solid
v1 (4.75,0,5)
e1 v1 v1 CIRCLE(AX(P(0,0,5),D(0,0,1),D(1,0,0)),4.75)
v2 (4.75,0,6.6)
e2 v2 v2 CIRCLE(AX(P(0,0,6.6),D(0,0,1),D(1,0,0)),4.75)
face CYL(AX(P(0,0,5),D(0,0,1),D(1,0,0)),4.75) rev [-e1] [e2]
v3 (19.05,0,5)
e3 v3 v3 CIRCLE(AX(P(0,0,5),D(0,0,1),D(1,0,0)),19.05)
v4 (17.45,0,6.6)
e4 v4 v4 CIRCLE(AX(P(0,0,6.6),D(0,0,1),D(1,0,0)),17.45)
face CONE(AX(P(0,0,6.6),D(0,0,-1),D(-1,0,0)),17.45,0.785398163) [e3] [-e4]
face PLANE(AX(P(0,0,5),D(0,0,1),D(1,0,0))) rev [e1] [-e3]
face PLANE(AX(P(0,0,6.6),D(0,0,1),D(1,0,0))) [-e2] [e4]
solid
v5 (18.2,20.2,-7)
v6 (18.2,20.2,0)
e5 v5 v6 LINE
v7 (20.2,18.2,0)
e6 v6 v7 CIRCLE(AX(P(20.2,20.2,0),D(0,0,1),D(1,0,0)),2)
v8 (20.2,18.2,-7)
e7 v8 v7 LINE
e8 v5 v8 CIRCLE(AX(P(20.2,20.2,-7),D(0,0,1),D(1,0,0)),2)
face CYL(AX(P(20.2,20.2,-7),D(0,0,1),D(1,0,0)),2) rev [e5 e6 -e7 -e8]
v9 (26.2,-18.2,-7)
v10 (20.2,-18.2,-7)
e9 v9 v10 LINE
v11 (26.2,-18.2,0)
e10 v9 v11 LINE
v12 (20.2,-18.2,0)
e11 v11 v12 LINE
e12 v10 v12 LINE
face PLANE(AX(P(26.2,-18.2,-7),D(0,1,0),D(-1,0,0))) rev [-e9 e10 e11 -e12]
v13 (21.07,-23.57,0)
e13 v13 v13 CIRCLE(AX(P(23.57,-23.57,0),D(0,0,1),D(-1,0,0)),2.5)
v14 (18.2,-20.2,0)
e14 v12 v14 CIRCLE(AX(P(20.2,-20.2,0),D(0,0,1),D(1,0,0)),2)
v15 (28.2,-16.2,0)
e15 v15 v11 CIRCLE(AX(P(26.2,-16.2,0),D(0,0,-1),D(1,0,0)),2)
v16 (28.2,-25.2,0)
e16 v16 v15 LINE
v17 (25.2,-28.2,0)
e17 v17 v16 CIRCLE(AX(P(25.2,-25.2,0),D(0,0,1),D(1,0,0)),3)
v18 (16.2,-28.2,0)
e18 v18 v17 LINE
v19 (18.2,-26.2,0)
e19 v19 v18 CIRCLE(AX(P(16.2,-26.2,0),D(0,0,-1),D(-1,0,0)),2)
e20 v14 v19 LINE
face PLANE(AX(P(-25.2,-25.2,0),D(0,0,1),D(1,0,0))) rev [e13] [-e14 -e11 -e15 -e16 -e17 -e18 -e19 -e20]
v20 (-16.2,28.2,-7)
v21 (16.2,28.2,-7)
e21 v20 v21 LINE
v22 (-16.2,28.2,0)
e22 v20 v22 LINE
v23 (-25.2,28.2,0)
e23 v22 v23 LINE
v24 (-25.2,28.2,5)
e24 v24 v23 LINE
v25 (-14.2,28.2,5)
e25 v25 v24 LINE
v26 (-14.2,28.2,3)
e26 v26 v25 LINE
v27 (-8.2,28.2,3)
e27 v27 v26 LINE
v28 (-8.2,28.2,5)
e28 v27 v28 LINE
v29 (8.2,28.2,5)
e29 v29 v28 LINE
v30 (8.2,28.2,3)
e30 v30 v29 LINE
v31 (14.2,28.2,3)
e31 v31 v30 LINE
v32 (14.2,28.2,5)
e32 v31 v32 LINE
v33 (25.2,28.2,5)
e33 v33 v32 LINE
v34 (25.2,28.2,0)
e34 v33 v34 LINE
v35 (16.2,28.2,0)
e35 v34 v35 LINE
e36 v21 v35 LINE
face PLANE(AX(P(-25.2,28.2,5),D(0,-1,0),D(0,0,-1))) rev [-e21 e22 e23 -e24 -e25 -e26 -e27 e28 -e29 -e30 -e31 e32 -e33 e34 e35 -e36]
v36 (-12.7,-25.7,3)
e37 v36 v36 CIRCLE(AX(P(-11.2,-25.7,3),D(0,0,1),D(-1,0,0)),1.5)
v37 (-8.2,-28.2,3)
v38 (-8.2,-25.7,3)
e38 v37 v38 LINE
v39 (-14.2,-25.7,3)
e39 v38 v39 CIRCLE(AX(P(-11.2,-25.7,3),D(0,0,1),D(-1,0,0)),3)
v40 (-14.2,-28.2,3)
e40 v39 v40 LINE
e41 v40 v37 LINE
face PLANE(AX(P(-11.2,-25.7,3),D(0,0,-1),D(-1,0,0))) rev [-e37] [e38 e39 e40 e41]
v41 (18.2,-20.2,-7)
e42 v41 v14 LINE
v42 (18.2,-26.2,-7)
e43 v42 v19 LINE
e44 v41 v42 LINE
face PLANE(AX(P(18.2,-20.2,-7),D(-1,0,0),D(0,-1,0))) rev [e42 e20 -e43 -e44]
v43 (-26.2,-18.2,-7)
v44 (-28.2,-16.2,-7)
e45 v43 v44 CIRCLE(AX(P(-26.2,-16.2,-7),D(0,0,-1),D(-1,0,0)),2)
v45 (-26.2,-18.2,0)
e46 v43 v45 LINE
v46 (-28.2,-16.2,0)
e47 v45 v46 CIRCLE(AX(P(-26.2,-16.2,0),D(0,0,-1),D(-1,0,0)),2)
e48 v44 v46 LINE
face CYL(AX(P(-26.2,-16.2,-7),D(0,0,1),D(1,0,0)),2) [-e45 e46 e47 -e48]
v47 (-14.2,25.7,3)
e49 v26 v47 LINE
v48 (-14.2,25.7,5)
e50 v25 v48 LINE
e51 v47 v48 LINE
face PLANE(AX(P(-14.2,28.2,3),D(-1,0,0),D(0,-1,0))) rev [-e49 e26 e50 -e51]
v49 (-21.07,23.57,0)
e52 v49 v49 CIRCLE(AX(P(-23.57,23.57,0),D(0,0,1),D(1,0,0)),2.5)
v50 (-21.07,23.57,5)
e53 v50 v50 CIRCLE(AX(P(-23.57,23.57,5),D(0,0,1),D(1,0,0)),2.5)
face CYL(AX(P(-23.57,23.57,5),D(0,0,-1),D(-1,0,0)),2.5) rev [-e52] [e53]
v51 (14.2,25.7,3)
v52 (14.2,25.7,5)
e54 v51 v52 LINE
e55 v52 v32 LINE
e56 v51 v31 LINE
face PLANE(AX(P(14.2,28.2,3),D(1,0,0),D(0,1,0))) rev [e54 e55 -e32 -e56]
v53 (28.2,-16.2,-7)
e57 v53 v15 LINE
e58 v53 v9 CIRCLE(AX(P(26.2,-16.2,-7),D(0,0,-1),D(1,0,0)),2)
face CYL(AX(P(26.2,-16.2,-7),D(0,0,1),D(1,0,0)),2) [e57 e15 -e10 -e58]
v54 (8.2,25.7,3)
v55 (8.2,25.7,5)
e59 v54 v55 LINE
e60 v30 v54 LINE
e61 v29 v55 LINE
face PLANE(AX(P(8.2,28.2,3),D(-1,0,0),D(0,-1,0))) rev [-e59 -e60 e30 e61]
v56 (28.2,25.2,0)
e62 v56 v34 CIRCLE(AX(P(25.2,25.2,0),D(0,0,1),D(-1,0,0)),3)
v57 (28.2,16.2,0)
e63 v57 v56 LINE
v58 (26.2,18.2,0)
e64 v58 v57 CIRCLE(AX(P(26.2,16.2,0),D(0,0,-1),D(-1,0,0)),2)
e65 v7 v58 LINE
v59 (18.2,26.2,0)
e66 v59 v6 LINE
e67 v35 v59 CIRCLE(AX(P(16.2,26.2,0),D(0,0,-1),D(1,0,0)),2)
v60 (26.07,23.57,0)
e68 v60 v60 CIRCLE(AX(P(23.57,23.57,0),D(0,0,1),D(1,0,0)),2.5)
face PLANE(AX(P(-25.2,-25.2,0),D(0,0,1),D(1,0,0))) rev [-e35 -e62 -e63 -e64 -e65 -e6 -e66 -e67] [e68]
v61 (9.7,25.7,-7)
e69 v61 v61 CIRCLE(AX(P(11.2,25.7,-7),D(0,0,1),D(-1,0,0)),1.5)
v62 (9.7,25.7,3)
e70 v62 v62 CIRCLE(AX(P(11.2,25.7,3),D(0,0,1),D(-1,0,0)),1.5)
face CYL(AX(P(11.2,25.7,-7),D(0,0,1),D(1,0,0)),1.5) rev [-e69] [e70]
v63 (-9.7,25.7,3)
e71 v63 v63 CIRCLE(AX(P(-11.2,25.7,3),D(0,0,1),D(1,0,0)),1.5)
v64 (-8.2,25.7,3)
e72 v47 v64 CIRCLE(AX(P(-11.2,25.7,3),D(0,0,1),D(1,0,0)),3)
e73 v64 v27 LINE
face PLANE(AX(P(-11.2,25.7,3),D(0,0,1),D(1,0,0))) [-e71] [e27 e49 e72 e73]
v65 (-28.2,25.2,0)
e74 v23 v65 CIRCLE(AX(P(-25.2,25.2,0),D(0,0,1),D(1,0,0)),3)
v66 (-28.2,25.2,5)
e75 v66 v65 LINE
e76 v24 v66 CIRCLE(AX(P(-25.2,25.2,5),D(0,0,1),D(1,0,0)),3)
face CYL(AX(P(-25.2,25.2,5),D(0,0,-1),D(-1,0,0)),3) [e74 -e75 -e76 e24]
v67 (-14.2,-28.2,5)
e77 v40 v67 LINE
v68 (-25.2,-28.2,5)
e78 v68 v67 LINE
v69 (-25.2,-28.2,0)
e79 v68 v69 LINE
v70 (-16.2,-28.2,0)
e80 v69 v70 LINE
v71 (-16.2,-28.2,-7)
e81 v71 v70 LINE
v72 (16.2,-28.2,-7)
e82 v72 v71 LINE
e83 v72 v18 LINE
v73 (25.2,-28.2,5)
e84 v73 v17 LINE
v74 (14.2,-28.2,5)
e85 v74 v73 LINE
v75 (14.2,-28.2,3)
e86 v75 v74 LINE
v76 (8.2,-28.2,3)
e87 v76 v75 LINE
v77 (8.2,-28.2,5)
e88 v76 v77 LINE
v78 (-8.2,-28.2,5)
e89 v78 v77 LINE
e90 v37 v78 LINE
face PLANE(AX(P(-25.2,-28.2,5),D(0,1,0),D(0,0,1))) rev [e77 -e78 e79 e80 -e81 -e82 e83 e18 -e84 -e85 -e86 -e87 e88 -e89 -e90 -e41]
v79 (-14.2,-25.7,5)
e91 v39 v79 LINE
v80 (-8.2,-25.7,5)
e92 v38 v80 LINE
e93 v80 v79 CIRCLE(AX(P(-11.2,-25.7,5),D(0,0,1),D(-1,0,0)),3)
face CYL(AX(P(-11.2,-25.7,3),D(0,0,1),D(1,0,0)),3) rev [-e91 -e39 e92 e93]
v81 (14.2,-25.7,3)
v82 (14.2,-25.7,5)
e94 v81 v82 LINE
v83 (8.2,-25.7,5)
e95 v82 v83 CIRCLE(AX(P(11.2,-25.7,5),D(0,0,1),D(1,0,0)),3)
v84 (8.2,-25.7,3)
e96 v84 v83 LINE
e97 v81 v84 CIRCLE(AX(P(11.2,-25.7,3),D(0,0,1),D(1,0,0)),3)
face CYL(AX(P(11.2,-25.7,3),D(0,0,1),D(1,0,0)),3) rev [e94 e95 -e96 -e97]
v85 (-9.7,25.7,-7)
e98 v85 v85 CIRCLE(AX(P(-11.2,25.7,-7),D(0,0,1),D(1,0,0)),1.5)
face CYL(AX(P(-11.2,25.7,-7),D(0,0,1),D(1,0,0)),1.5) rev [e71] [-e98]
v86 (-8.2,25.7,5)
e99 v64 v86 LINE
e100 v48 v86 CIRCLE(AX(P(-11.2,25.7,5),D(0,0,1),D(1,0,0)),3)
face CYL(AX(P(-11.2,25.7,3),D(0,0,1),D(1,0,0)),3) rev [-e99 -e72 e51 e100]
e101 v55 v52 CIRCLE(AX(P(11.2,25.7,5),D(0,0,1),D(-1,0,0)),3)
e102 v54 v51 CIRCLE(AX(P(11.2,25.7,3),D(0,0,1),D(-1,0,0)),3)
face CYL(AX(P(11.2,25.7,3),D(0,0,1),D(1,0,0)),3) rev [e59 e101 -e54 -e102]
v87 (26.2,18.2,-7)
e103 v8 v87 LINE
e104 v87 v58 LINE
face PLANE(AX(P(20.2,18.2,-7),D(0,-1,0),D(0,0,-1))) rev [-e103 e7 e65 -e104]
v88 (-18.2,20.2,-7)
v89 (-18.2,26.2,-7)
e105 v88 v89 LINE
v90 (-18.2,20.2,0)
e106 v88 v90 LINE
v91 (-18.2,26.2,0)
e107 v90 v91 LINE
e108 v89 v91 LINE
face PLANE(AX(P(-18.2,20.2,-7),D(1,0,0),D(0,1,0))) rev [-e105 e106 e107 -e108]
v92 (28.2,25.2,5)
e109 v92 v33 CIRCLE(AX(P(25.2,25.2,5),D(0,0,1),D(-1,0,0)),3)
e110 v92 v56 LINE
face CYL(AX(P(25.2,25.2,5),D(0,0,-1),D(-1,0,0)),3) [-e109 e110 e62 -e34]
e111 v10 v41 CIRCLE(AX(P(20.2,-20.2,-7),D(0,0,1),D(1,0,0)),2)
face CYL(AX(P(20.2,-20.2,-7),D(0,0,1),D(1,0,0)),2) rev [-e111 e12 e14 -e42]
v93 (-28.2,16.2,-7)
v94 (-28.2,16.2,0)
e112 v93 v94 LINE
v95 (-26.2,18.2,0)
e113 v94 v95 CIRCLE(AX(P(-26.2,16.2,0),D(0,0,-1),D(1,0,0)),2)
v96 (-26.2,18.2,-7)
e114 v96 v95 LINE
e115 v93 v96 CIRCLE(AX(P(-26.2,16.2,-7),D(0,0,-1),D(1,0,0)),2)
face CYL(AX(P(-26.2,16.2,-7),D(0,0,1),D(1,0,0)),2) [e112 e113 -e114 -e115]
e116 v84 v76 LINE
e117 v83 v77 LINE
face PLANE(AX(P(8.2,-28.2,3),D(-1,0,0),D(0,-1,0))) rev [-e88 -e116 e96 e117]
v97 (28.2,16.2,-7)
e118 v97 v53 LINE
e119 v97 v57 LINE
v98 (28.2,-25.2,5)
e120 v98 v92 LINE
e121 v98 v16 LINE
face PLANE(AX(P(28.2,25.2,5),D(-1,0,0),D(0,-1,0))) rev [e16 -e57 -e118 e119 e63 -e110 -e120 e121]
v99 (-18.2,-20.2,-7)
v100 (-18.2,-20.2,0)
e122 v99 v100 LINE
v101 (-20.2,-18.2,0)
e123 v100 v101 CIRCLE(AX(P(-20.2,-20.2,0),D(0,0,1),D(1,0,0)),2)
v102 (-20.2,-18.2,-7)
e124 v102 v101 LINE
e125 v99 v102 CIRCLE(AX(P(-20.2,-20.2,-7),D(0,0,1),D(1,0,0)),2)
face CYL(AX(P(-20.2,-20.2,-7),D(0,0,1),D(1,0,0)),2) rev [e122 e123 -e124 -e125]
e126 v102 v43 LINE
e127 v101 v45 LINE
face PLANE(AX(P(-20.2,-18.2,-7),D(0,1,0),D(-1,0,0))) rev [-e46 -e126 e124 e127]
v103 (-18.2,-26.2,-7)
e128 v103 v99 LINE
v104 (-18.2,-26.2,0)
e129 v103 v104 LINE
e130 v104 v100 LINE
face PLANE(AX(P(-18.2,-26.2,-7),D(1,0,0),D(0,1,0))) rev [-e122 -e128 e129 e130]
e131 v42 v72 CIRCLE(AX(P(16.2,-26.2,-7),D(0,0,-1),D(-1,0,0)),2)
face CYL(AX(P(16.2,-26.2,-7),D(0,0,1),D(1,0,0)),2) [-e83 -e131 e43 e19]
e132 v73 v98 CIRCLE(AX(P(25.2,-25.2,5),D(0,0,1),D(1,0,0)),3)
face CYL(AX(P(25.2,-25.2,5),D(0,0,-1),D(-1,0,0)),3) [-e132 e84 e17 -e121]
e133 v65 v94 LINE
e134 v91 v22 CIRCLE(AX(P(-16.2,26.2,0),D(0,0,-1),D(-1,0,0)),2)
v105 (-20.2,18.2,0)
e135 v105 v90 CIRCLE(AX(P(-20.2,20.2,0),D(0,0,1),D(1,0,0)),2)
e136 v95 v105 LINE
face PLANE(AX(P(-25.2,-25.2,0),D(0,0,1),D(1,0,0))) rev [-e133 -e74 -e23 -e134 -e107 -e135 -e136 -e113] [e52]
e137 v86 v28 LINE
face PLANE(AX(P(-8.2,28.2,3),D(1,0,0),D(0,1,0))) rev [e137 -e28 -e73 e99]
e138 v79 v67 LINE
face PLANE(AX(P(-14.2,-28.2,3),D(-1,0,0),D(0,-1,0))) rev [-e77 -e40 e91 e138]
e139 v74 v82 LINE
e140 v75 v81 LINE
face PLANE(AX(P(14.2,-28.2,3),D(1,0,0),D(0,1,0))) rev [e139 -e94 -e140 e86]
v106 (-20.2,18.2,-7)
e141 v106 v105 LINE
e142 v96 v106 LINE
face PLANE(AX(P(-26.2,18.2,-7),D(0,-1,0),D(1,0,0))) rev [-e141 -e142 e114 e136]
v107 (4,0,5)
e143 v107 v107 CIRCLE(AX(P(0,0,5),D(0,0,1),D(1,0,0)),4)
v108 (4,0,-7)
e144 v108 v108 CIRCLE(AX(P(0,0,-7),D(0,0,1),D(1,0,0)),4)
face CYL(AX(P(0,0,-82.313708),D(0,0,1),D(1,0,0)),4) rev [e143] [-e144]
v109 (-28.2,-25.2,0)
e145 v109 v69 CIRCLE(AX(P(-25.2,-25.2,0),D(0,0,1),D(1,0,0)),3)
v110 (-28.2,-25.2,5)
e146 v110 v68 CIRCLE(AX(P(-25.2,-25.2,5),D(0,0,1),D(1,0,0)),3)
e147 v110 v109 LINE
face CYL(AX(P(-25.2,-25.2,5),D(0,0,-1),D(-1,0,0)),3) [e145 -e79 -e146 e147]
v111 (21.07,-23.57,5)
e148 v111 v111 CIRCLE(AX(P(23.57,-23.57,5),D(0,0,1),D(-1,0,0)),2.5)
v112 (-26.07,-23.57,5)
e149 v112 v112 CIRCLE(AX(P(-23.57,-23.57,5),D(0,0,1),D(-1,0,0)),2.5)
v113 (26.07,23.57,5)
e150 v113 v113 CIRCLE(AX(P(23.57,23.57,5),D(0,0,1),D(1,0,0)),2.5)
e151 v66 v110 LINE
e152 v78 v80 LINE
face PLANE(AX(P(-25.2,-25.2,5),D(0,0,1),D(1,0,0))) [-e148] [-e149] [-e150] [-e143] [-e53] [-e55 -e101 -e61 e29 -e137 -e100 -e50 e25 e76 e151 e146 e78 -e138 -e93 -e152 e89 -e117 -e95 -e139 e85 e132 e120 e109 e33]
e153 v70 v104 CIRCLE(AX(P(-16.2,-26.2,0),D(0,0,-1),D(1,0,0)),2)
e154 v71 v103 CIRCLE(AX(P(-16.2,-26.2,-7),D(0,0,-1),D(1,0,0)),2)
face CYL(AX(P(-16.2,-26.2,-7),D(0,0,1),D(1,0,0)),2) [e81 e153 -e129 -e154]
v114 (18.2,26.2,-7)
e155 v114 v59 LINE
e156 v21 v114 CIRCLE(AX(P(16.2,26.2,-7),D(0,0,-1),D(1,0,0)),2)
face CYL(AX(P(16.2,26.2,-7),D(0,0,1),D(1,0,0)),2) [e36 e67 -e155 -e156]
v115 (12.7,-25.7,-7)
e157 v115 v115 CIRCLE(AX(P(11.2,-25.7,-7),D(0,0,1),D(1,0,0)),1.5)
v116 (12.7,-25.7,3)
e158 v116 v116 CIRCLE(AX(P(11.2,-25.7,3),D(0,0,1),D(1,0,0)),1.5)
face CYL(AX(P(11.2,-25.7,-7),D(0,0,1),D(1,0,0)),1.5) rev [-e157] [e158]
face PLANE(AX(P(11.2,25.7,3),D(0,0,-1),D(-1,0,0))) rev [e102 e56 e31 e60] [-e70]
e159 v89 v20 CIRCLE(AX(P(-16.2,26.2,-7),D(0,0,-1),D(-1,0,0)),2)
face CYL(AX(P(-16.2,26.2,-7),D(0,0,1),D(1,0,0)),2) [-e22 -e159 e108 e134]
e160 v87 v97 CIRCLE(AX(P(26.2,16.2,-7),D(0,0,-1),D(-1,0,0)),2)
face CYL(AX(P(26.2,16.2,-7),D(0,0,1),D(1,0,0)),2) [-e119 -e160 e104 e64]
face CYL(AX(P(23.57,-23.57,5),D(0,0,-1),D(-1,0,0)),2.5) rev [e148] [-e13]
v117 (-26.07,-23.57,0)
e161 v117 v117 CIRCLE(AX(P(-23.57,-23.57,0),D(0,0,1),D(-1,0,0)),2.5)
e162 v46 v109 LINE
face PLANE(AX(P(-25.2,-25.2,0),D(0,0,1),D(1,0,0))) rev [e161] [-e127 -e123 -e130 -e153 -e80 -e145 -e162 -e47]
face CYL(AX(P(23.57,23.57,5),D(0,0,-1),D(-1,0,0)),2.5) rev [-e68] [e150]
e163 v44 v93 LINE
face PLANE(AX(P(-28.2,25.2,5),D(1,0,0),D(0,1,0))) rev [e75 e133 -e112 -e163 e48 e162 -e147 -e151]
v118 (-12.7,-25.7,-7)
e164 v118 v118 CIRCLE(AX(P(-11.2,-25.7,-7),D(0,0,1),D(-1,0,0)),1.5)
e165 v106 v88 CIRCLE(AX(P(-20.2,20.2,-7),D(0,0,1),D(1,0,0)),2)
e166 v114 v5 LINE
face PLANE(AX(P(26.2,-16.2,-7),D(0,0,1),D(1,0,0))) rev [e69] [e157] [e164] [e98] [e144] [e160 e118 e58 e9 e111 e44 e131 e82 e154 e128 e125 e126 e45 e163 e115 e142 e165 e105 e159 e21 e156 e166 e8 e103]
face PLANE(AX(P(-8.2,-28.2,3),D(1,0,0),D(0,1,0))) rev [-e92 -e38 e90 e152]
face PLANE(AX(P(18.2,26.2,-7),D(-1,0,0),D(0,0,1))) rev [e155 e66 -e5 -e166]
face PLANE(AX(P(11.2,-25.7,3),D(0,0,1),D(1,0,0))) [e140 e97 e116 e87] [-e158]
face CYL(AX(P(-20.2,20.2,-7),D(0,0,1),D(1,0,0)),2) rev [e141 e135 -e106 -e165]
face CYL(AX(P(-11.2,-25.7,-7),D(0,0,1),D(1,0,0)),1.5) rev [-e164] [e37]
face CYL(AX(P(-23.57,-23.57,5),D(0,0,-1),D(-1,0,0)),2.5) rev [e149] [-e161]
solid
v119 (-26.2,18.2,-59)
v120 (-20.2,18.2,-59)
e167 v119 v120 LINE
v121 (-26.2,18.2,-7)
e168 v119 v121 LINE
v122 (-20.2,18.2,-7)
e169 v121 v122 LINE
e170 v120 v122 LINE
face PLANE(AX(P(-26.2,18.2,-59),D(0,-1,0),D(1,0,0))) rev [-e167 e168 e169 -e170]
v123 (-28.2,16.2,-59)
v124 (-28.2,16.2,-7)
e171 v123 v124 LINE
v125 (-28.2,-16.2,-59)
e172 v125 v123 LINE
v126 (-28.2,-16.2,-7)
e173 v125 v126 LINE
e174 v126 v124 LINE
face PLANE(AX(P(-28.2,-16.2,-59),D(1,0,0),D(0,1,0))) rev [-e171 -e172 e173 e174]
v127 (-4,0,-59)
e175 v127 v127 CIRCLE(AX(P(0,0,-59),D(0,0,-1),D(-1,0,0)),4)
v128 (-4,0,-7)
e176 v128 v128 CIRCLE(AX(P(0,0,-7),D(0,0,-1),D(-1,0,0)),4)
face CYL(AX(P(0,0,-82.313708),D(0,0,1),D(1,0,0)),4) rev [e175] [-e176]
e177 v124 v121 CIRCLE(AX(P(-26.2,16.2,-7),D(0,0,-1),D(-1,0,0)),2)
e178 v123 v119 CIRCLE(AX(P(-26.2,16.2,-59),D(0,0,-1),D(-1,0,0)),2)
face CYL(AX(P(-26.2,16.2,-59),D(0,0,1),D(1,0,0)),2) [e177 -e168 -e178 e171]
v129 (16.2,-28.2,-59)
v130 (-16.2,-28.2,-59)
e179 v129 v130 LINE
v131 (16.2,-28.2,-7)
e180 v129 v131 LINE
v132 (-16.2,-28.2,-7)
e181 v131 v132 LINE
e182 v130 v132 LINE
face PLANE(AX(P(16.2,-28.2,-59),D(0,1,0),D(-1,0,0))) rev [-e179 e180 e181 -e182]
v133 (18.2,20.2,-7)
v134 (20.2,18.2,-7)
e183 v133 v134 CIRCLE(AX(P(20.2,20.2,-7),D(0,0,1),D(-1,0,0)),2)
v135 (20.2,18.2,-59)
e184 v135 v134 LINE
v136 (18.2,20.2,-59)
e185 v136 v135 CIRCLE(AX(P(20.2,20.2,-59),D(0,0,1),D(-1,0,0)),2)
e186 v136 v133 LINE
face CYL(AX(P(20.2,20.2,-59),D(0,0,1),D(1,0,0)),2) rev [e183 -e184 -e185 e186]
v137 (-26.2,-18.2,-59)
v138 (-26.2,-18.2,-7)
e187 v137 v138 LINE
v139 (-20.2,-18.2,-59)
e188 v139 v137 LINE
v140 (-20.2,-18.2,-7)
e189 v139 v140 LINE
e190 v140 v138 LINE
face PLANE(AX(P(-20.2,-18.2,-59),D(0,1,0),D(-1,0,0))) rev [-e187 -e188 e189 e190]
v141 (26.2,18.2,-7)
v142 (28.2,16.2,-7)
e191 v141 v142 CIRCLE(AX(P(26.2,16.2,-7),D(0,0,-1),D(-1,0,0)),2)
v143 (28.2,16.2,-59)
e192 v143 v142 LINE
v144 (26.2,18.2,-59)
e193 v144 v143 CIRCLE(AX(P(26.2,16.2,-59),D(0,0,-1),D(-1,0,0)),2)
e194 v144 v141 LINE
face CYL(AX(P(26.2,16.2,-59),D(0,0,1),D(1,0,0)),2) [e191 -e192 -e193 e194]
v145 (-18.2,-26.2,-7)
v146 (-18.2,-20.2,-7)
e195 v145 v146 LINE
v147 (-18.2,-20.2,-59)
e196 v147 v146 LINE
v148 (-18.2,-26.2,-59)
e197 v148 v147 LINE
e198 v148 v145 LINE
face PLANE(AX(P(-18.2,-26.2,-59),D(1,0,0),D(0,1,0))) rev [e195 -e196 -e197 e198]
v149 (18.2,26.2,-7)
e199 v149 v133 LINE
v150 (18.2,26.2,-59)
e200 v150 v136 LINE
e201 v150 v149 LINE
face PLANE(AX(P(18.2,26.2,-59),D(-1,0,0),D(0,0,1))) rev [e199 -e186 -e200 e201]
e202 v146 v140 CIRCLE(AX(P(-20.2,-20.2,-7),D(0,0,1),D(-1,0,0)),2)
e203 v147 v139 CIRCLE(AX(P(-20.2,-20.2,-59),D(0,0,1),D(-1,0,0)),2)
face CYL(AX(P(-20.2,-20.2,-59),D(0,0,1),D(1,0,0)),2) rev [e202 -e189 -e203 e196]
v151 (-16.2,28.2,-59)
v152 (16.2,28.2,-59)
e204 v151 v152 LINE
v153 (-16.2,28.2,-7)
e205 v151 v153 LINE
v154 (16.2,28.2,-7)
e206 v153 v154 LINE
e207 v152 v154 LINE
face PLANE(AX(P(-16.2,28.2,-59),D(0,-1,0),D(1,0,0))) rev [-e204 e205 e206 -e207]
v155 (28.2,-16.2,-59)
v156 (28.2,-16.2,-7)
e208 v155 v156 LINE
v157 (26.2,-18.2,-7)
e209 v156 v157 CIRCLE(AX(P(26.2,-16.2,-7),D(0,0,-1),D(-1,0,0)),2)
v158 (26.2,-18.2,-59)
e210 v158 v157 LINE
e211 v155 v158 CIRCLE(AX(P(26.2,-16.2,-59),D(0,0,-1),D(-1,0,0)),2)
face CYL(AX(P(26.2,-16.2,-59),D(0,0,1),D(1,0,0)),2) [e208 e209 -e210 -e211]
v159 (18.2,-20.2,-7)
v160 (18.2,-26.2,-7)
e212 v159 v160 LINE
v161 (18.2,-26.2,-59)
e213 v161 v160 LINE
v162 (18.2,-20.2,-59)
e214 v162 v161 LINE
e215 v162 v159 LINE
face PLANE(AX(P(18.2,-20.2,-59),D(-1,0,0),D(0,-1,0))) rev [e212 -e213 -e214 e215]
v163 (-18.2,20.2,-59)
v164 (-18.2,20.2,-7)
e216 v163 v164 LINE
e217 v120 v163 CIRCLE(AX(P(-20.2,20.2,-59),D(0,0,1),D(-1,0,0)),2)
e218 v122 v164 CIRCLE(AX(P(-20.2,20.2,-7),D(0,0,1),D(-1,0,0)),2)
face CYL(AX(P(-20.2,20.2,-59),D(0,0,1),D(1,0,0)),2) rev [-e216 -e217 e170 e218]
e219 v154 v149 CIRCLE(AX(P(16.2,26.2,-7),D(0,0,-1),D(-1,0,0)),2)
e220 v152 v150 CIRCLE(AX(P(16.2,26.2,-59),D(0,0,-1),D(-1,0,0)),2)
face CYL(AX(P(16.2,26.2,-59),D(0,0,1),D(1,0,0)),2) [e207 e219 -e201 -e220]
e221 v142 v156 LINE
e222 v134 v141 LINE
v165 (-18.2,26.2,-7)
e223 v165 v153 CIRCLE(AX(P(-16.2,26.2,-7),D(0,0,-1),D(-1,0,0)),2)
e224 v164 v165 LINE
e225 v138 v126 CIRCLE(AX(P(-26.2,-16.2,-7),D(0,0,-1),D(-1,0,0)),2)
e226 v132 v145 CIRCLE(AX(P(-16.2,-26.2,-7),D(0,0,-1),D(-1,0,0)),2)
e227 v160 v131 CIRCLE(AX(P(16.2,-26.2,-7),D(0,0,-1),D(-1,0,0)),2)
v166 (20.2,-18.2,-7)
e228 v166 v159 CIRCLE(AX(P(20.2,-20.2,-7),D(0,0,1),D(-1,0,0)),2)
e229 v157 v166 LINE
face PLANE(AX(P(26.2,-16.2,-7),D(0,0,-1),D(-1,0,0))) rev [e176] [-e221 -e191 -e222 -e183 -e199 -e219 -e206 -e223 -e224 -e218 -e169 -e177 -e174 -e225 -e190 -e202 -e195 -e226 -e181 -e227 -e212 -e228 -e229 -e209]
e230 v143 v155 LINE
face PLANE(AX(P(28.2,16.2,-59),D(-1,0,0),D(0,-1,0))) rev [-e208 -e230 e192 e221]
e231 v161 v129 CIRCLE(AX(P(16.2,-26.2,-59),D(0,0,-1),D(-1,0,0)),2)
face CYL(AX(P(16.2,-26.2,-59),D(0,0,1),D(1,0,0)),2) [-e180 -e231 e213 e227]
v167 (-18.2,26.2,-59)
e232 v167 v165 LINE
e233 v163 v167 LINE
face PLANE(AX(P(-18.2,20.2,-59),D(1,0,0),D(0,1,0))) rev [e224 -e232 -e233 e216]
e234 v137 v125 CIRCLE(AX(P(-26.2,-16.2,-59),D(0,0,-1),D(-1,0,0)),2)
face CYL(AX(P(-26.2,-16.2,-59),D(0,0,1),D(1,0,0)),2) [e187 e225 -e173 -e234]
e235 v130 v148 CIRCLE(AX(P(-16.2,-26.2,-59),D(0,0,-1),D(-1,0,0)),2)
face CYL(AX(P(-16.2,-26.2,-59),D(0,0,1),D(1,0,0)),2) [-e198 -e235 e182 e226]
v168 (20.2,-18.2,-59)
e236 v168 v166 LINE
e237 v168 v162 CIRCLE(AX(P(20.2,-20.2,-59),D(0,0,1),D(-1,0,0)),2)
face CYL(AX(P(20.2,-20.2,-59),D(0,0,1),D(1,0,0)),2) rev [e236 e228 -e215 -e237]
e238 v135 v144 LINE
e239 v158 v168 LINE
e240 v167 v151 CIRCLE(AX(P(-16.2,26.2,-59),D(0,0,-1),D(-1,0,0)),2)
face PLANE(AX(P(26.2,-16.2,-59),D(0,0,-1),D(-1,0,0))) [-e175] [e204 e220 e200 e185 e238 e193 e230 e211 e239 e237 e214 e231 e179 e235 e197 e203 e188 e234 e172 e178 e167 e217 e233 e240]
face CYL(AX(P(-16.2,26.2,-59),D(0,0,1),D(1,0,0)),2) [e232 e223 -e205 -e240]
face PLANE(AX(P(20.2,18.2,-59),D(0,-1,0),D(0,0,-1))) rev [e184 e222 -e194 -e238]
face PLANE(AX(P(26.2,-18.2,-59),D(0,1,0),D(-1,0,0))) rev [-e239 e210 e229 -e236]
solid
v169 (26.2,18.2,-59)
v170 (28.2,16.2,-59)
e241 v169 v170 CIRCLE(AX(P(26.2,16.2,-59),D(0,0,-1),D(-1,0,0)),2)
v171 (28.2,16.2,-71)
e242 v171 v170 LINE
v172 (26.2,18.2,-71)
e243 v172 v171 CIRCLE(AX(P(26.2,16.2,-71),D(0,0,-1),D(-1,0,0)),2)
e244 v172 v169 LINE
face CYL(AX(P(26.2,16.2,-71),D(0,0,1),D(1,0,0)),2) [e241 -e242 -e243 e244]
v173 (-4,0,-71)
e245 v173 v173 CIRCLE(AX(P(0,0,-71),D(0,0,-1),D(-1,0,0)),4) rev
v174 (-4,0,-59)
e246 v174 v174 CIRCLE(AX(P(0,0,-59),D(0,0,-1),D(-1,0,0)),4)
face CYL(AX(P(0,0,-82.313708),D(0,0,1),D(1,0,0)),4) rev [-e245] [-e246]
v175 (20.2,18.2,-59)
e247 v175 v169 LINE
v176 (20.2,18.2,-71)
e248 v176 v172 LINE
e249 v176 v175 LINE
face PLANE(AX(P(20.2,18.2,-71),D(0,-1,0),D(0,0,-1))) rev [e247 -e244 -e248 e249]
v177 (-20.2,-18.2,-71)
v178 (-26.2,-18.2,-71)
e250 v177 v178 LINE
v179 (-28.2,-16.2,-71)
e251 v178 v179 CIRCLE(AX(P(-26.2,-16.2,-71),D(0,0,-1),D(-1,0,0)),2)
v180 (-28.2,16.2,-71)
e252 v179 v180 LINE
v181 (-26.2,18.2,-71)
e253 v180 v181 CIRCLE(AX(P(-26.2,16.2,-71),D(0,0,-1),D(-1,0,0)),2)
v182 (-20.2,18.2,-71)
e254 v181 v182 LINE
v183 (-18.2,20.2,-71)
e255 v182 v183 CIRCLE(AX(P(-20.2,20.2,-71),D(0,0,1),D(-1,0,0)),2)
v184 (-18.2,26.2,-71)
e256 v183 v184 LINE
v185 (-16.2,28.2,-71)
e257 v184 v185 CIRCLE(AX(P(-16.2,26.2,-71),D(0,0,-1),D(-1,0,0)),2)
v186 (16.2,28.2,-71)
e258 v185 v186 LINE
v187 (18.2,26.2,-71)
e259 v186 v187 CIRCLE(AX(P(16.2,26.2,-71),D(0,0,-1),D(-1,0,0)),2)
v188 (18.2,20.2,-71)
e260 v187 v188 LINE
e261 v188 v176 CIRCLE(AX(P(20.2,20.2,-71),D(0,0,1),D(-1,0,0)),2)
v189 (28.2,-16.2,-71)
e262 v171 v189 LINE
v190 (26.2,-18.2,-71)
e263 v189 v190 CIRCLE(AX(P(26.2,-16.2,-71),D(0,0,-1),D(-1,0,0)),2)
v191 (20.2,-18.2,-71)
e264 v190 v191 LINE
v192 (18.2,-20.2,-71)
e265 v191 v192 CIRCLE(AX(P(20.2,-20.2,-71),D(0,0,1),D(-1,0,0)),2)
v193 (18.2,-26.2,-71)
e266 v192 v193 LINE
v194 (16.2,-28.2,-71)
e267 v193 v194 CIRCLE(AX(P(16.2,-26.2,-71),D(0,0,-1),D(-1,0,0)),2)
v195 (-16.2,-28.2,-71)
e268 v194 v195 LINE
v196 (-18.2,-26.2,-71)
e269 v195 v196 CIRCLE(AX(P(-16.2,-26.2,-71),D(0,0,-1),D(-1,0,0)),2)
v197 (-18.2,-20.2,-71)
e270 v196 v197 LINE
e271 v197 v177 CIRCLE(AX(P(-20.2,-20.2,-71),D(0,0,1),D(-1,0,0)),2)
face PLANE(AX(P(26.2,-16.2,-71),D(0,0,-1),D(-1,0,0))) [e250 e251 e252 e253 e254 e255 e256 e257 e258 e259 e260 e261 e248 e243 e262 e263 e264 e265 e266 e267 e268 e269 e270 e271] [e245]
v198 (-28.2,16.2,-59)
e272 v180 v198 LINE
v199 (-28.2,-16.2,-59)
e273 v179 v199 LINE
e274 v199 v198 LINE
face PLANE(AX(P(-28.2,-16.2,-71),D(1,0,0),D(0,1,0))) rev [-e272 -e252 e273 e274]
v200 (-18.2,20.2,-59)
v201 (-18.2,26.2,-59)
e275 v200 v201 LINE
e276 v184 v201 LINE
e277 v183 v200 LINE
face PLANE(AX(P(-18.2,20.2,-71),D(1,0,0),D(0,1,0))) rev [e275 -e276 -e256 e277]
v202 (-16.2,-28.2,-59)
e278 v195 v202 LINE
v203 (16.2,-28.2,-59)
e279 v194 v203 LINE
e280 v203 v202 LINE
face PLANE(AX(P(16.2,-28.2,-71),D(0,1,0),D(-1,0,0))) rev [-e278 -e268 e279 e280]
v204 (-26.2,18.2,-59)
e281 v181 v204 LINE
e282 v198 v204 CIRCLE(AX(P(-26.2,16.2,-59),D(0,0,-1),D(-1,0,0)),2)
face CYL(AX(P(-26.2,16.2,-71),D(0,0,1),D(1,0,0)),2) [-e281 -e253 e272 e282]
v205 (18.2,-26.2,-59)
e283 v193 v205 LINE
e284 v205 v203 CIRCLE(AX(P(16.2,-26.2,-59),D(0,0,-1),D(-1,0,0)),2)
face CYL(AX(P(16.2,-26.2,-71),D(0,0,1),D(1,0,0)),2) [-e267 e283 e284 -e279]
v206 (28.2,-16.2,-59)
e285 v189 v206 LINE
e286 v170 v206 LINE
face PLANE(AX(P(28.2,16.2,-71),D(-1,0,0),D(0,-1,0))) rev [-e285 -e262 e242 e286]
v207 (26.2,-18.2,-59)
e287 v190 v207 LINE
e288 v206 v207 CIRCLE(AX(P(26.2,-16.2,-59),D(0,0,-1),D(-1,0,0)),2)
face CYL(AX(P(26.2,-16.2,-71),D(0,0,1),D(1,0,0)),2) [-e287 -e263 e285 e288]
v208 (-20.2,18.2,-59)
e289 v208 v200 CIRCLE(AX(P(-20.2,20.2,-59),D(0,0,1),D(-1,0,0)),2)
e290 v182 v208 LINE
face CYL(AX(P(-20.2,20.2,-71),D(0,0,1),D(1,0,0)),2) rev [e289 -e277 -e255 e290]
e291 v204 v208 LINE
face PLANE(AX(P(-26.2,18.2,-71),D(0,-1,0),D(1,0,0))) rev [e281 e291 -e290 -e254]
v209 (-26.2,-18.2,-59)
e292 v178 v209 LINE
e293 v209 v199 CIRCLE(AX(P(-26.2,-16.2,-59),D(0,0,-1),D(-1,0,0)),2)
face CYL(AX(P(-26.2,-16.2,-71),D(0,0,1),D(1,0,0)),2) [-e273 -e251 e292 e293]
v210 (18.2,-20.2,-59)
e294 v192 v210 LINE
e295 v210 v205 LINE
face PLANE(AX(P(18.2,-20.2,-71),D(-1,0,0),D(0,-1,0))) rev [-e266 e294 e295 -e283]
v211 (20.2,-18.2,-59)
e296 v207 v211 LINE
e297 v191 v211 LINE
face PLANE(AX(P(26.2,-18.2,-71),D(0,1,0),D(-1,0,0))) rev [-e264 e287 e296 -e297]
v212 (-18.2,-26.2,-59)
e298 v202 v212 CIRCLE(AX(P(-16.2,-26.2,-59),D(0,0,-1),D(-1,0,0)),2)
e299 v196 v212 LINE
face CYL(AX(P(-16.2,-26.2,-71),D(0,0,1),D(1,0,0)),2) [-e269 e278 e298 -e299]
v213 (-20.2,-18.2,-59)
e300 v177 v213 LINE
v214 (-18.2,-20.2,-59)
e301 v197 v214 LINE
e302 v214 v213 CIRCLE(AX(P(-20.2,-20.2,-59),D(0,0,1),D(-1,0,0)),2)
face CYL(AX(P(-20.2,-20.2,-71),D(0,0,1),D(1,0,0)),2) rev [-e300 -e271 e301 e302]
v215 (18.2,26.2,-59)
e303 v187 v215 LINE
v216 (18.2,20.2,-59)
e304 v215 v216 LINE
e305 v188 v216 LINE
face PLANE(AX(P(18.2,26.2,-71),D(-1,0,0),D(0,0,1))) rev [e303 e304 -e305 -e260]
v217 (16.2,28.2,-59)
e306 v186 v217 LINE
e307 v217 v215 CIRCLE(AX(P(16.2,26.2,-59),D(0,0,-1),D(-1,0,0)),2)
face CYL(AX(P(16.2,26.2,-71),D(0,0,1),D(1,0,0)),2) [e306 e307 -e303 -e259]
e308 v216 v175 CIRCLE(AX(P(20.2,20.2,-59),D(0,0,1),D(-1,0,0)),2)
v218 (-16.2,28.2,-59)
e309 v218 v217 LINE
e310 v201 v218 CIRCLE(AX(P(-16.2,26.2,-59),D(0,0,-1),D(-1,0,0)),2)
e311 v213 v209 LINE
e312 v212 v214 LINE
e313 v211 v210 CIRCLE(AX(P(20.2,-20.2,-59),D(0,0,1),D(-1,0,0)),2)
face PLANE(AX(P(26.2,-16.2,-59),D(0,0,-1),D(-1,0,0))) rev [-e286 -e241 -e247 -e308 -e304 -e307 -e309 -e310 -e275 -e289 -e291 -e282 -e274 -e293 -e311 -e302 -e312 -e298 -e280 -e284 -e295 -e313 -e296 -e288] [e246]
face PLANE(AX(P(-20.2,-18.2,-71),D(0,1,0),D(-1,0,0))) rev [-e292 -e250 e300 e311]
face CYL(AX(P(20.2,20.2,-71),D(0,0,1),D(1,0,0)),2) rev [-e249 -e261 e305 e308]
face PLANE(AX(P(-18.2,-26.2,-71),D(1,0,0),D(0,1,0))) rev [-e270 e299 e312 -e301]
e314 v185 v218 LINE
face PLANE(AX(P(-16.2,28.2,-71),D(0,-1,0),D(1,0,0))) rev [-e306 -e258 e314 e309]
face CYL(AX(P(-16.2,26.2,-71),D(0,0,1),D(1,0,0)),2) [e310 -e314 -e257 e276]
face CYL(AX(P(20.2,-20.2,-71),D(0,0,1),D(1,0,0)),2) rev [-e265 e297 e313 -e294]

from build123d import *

# Parameters (mm, degrees)
IZIM2_R                     = 2.5
Y_KSEKLIK_EKSTR_ZYON1_DEPTH = 5
Y_KSEKLIK_EKSTR_ZYON2_DEPTH = 7
KES_EKSTR_ZYON1_DEPTH       = 2
IZIM6_R                     = 19.05
Y_KSEKLIK_EKSTR_ZYON3_DEPTH = 1.6
PAH1_SIZE                   = 1.6
Y_KSEKLIK_EKSTR_ZYON5_DEPTH = 52
Y_KSEKLIK_EKSTR_ZYON6_DEPTH = 12
IZIM10_R                    = 1.5
KES_EKSTR_ZYON3_DEPTH       = 10
KES_EKSTR_ZYON4_START       = -77.6
IZIM7_R                     = 4
KES_EKSTR_ZYON4_DEPTH       = 77.6
IZIM11_R                    = 4.75
KES_EKSTR_ZYON5_DEPTH       = 1.6


with BuildPart() as part:
    # Çizim2 → Yükseklik-Ekstrüzyon1 (new body)
    with BuildSketch(Plane.XY):
        with BuildLine():
            Line((-25.2, 28.2), (25.2, 28.2))
            ThreePointArc((25.2, 28.2), (27.321320344, 27.321320344), (28.2, 25.2))
            Line((28.2, 25.2), (28.2, -25.2))
            ThreePointArc((28.2, -25.2), (27.321320344, -27.321320344), (25.2, -28.2))
            Line((25.2, -28.2), (-25.2, -28.2))
            ThreePointArc((-25.2, -28.2), (-27.321320344, -27.321320344), (-28.2, -25.2))
            Line((-28.2, -25.2), (-28.2, 25.2))
            ThreePointArc((-28.2, 25.2), (-27.321320344, 27.321320344), (-25.2, 28.2))
        make_face()
        with Locations((-23.57, 23.57)):
            Circle(IZIM2_R, mode=Mode.SUBTRACT)
        with Locations((23.57, 23.57)):
            Circle(IZIM2_R, mode=Mode.SUBTRACT)
        with Locations(Location((23.57, -23.57, 0), (0, 0, 180))):
            Circle(IZIM2_R, mode=Mode.SUBTRACT)
        with Locations(Location((-23.57, -23.57, 0), (0, 0, 180))):
            Circle(IZIM2_R, mode=Mode.SUBTRACT)
    extrude(amount=Y_KSEKLIK_EKSTR_ZYON1_DEPTH)

    # Çizim4 → Yükseklik-Ekstrüzyon2 (add)
    with BuildSketch(Plane(origin=(0, 0, 0), x_dir=(-1, 0, 0), z_dir=(0, 0, -1))):
        with BuildLine():
            Line((-18.2, 26.2), (-18.2, 20.2))
            ThreePointArc((-18.2, 20.2), (-18.785786438, 18.785786438), (-20.2, 18.2))
            Line((-20.2, 18.2), (-26.2, 18.2))
            ThreePointArc((-26.2, 18.2), (-27.614213562, 17.614213562), (-28.2, 16.2))
            Line((-28.2, 16.2), (-28.2, -16.2))
            ThreePointArc((-28.2, -16.2), (-27.614213562, -17.614213562), (-26.2, -18.2))
            Line((-26.2, -18.2), (-20.2, -18.2))
            ThreePointArc((-20.2, -18.2), (-18.785786438, -18.785786438), (-18.2, -20.2))
            Line((-18.2, -20.2), (-18.2, -26.2))
            ThreePointArc((-18.2, -26.2), (-17.614213562, -27.614213562), (-16.2, -28.2))
            Line((-16.2, -28.2), (16.2, -28.2))
            ThreePointArc((16.2, -28.2), (17.614213562, -27.614213562), (18.2, -26.2))
            Line((18.2, -26.2), (18.2, -20.2))
            ThreePointArc((18.2, -20.2), (18.785786438, -18.785786438), (20.2, -18.2))
            Line((20.2, -18.2), (26.2, -18.2))
            ThreePointArc((26.2, -18.2), (27.614213562, -17.614213562), (28.2, -16.2))
            Line((28.2, -16.2), (28.2, 16.2))
            ThreePointArc((28.2, 16.2), (27.614213562, 17.614213562), (26.2, 18.2))
            Line((26.2, 18.2), (20.2, 18.2))
            ThreePointArc((20.2, 18.2), (18.785786438, 18.785786438), (18.2, 20.2))
            Line((18.2, 20.2), (18.2, 26.2))
            ThreePointArc((18.2, 26.2), (17.614213562, 27.614213562), (16.2, 28.2))
            Line((16.2, 28.2), (-16.2, 28.2))
            ThreePointArc((-16.2, 28.2), (-17.614213562, 27.614213562), (-18.2, 26.2))
        make_face()
    extrude(amount=Y_KSEKLIK_EKSTR_ZYON2_DEPTH)

    # Çizim5 → Kes-Ekstrüzyon1 (cut)
    with BuildSketch(Plane.XY.offset(5)):
        with BuildLine():
            Line((-14.2, 28.2), (-14.2, 25.7))
            ThreePointArc((-14.2, 25.7), (-11.2, 22.7), (-8.2, 25.7))
            Line((-8.2, 25.7), (-8.2, 28.2))
            Line((-8.2, 28.2), (-14.2, 28.2))
        make_face()
        with BuildLine():
            Line((-14.2, -28.2), (-8.2, -28.2))
            Line((-8.2, -28.2), (-8.2, -25.7))
            ThreePointArc((-8.2, -25.7), (-11.2, -22.7), (-14.2, -25.7))
            Line((-14.2, -25.7), (-14.2, -28.2))
        make_face()
        with BuildLine():
            Line((14.2, -28.2), (14.2, -25.7))
            ThreePointArc((14.2, -25.7), (11.2, -22.7), (8.2, -25.7))
            Line((8.2, -25.7), (8.2, -28.2))
            Line((8.2, -28.2), (14.2, -28.2))
        make_face()
        with BuildLine():
            Line((14.2, 28.2), (8.2, 28.2))
            Line((8.2, 28.2), (8.2, 25.7))
            ThreePointArc((8.2, 25.7), (11.2, 22.7), (14.2, 25.7))
            Line((14.2, 25.7), (14.2, 28.2))
        make_face()
    extrude(amount=-KES_EKSTR_ZYON1_DEPTH, mode=Mode.SUBTRACT)

    # Çizim10 → Kes-Ekstrüzyon3 (cut)
    with BuildSketch(Plane.XY.offset(3)):
        with Locations((-11.2, 25.7)):
            Circle(IZIM10_R)
        with Locations(Location((-11.2, -25.7, 0), (0, 0, 180))):
            Circle(IZIM10_R)
        with Locations((11.2, -25.7)):
            Circle(IZIM10_R)
        with Locations(Location((11.2, 25.7, 0), (0, 0, 180))):
            Circle(IZIM10_R)
    extrude(amount=-KES_EKSTR_ZYON3_DEPTH, mode=Mode.SUBTRACT)


with BuildPart() as body_2:
    # Çizim6 → Yükseklik-Ekstrüzyon3 (new body)
    with BuildSketch(Plane.XY.offset(5)):
        Circle(IZIM6_R)
    extrude(amount=Y_KSEKLIK_EKSTR_ZYON3_DEPTH)

    # Pah1
    pah1_edges = [body_2.edges().sort_by_distance(p)[0] for p in [
        (-19.05, 0, 6.6),
    ]]
    chamfer(pah1_edges, length=PAH1_SIZE - 0.0001)  # a hair under: the kernel refuses the full size


with BuildPart() as body_3:
    # Çizim8 → Yükseklik-Ekstrüzyon5 (new body)
    with BuildSketch(Plane(origin=(0, 0, -7), x_dir=(-1, 0, 0), z_dir=(0, 0, -1))):
        with BuildLine():
            Line((-26.2, -18.2), (-20.2, -18.2))
            ThreePointArc((-20.2, -18.2), (-18.785786438, -18.785786438), (-18.2, -20.2))
            Line((-18.2, -20.2), (-18.2, -26.2))
            ThreePointArc((-18.2, -26.2), (-17.614213562, -27.614213562), (-16.2, -28.2))
            Line((-16.2, -28.2), (16.2, -28.2))
            ThreePointArc((16.2, -28.2), (17.614213562, -27.614213562), (18.2, -26.2))
            Line((18.2, -26.2), (18.2, -20.2))
            ThreePointArc((18.2, -20.2), (18.785786438, -18.785786438), (20.2, -18.2))
            Line((20.2, -18.2), (26.2, -18.2))
            ThreePointArc((26.2, -18.2), (27.614213562, -17.614213562), (28.2, -16.2))
            Line((28.2, -16.2), (28.2, 16.2))
            ThreePointArc((28.2, 16.2), (27.614213562, 17.614213562), (26.2, 18.2))
            Line((26.2, 18.2), (20.2, 18.2))
            ThreePointArc((20.2, 18.2), (18.785786438, 18.785786438), (18.2, 20.2))
            Line((18.2, 20.2), (18.2, 26.2))
            ThreePointArc((18.2, 26.2), (17.614213562, 27.614213562), (16.2, 28.2))
            Line((16.2, 28.2), (-16.2, 28.2))
            ThreePointArc((-16.2, 28.2), (-17.614213562, 27.614213562), (-18.2, 26.2))
            Line((-18.2, 26.2), (-18.2, 20.2))
            ThreePointArc((-18.2, 20.2), (-18.785786438, 18.785786438), (-20.2, 18.2))
            Line((-20.2, 18.2), (-26.2, 18.2))
            ThreePointArc((-26.2, 18.2), (-27.614213562, 17.614213562), (-28.2, 16.2))
            Line((-28.2, 16.2), (-28.2, -16.2))
            ThreePointArc((-28.2, -16.2), (-27.614213562, -17.614213562), (-26.2, -18.2))
        make_face()
    extrude(amount=Y_KSEKLIK_EKSTR_ZYON5_DEPTH)


with BuildPart() as body_4:
    # Çizim9 → Yükseklik-Ekstrüzyon6 (new body)
    with BuildSketch(Plane(origin=(0, 0, -59), x_dir=(-1, 0, 0), z_dir=(0, 0, -1))):
        with BuildLine():
            Line((-26.2, -18.2), (-20.2, -18.2))
            ThreePointArc((-20.2, -18.2), (-18.785786438, -18.785786438), (-18.2, -20.2))
            Line((-18.2, -20.2), (-18.2, -26.2))
            ThreePointArc((-18.2, -26.2), (-17.614213562, -27.614213562), (-16.2, -28.2))
            Line((-16.2, -28.2), (16.2, -28.2))
            ThreePointArc((16.2, -28.2), (17.614213562, -27.614213562), (18.2, -26.2))
            Line((18.2, -26.2), (18.2, -20.2))
            ThreePointArc((18.2, -20.2), (18.785786438, -18.785786438), (20.2, -18.2))
            Line((20.2, -18.2), (26.2, -18.2))
            ThreePointArc((26.2, -18.2), (27.614213562, -17.614213562), (28.2, -16.2))
            Line((28.2, -16.2), (28.2, 16.2))
            ThreePointArc((28.2, 16.2), (27.614213562, 17.614213562), (26.2, 18.2))
            Line((26.2, 18.2), (20.2, 18.2))
            ThreePointArc((20.2, 18.2), (18.785786438, 18.785786438), (18.2, 20.2))
            Line((18.2, 20.2), (18.2, 26.2))
            ThreePointArc((18.2, 26.2), (17.614213562, 27.614213562), (16.2, 28.2))
            Line((16.2, 28.2), (-16.2, 28.2))
            ThreePointArc((-16.2, 28.2), (-17.614213562, 27.614213562), (-18.2, 26.2))
            Line((-18.2, 26.2), (-18.2, 20.2))
            ThreePointArc((-18.2, 20.2), (-18.785786438, 18.785786438), (-20.2, 18.2))
            Line((-20.2, 18.2), (-26.2, 18.2))
            ThreePointArc((-26.2, 18.2), (-27.614213562, 17.614213562), (-28.2, 16.2))
            Line((-28.2, 16.2), (-28.2, -16.2))
            ThreePointArc((-28.2, -16.2), (-27.614213562, -17.614213562), (-26.2, -18.2))
        make_face()
    extrude(amount=Y_KSEKLIK_EKSTR_ZYON6_DEPTH)


with BuildPart() as kes_ekstr_zyon4_tool:
    # Çizim7 → Kes-Ekstrüzyon4 (new body)
    with BuildSketch(Plane.XY.offset(6.6).offset(KES_EKSTR_ZYON4_START)):
        with Locations(Location((0, 0, 0), (0, 0, 180))):
            Circle(IZIM7_R)
    extrude(amount=KES_EKSTR_ZYON4_DEPTH)


with BuildPart() as part_1:
    add(part.part)

    # Kes-Ekstrüzyon4: cut by kes_ekstr_zyon4_tool
    add(kes_ekstr_zyon4_tool.part, mode=Mode.SUBTRACT)


with BuildPart() as body_2_1:
    add(body_2.part)

    # Kes-Ekstrüzyon4: cut by kes_ekstr_zyon4_tool
    add(kes_ekstr_zyon4_tool.part, mode=Mode.SUBTRACT)

    # Çizim11 → Kes-Ekstrüzyon5 (cut)
    with BuildSketch(Plane.XY.offset(6.6)):
        Circle(IZIM11_R)
    extrude(amount=-KES_EKSTR_ZYON5_DEPTH, mode=Mode.SUBTRACT)


with BuildPart() as body_3_1:
    add(body_3.part)

    # Kes-Ekstrüzyon4: cut by kes_ekstr_zyon4_tool
    add(kes_ekstr_zyon4_tool.part, mode=Mode.SUBTRACT)


with BuildPart() as body_4_1:
    add(body_4.part)

    # Kes-Ekstrüzyon4: cut by kes_ekstr_zyon4_tool
    add(kes_ekstr_zyon4_tool.part, mode=Mode.SUBTRACT)


solid = Compound([part_1.part, body_2_1.part, body_3_1.part, body_4_1.part])
